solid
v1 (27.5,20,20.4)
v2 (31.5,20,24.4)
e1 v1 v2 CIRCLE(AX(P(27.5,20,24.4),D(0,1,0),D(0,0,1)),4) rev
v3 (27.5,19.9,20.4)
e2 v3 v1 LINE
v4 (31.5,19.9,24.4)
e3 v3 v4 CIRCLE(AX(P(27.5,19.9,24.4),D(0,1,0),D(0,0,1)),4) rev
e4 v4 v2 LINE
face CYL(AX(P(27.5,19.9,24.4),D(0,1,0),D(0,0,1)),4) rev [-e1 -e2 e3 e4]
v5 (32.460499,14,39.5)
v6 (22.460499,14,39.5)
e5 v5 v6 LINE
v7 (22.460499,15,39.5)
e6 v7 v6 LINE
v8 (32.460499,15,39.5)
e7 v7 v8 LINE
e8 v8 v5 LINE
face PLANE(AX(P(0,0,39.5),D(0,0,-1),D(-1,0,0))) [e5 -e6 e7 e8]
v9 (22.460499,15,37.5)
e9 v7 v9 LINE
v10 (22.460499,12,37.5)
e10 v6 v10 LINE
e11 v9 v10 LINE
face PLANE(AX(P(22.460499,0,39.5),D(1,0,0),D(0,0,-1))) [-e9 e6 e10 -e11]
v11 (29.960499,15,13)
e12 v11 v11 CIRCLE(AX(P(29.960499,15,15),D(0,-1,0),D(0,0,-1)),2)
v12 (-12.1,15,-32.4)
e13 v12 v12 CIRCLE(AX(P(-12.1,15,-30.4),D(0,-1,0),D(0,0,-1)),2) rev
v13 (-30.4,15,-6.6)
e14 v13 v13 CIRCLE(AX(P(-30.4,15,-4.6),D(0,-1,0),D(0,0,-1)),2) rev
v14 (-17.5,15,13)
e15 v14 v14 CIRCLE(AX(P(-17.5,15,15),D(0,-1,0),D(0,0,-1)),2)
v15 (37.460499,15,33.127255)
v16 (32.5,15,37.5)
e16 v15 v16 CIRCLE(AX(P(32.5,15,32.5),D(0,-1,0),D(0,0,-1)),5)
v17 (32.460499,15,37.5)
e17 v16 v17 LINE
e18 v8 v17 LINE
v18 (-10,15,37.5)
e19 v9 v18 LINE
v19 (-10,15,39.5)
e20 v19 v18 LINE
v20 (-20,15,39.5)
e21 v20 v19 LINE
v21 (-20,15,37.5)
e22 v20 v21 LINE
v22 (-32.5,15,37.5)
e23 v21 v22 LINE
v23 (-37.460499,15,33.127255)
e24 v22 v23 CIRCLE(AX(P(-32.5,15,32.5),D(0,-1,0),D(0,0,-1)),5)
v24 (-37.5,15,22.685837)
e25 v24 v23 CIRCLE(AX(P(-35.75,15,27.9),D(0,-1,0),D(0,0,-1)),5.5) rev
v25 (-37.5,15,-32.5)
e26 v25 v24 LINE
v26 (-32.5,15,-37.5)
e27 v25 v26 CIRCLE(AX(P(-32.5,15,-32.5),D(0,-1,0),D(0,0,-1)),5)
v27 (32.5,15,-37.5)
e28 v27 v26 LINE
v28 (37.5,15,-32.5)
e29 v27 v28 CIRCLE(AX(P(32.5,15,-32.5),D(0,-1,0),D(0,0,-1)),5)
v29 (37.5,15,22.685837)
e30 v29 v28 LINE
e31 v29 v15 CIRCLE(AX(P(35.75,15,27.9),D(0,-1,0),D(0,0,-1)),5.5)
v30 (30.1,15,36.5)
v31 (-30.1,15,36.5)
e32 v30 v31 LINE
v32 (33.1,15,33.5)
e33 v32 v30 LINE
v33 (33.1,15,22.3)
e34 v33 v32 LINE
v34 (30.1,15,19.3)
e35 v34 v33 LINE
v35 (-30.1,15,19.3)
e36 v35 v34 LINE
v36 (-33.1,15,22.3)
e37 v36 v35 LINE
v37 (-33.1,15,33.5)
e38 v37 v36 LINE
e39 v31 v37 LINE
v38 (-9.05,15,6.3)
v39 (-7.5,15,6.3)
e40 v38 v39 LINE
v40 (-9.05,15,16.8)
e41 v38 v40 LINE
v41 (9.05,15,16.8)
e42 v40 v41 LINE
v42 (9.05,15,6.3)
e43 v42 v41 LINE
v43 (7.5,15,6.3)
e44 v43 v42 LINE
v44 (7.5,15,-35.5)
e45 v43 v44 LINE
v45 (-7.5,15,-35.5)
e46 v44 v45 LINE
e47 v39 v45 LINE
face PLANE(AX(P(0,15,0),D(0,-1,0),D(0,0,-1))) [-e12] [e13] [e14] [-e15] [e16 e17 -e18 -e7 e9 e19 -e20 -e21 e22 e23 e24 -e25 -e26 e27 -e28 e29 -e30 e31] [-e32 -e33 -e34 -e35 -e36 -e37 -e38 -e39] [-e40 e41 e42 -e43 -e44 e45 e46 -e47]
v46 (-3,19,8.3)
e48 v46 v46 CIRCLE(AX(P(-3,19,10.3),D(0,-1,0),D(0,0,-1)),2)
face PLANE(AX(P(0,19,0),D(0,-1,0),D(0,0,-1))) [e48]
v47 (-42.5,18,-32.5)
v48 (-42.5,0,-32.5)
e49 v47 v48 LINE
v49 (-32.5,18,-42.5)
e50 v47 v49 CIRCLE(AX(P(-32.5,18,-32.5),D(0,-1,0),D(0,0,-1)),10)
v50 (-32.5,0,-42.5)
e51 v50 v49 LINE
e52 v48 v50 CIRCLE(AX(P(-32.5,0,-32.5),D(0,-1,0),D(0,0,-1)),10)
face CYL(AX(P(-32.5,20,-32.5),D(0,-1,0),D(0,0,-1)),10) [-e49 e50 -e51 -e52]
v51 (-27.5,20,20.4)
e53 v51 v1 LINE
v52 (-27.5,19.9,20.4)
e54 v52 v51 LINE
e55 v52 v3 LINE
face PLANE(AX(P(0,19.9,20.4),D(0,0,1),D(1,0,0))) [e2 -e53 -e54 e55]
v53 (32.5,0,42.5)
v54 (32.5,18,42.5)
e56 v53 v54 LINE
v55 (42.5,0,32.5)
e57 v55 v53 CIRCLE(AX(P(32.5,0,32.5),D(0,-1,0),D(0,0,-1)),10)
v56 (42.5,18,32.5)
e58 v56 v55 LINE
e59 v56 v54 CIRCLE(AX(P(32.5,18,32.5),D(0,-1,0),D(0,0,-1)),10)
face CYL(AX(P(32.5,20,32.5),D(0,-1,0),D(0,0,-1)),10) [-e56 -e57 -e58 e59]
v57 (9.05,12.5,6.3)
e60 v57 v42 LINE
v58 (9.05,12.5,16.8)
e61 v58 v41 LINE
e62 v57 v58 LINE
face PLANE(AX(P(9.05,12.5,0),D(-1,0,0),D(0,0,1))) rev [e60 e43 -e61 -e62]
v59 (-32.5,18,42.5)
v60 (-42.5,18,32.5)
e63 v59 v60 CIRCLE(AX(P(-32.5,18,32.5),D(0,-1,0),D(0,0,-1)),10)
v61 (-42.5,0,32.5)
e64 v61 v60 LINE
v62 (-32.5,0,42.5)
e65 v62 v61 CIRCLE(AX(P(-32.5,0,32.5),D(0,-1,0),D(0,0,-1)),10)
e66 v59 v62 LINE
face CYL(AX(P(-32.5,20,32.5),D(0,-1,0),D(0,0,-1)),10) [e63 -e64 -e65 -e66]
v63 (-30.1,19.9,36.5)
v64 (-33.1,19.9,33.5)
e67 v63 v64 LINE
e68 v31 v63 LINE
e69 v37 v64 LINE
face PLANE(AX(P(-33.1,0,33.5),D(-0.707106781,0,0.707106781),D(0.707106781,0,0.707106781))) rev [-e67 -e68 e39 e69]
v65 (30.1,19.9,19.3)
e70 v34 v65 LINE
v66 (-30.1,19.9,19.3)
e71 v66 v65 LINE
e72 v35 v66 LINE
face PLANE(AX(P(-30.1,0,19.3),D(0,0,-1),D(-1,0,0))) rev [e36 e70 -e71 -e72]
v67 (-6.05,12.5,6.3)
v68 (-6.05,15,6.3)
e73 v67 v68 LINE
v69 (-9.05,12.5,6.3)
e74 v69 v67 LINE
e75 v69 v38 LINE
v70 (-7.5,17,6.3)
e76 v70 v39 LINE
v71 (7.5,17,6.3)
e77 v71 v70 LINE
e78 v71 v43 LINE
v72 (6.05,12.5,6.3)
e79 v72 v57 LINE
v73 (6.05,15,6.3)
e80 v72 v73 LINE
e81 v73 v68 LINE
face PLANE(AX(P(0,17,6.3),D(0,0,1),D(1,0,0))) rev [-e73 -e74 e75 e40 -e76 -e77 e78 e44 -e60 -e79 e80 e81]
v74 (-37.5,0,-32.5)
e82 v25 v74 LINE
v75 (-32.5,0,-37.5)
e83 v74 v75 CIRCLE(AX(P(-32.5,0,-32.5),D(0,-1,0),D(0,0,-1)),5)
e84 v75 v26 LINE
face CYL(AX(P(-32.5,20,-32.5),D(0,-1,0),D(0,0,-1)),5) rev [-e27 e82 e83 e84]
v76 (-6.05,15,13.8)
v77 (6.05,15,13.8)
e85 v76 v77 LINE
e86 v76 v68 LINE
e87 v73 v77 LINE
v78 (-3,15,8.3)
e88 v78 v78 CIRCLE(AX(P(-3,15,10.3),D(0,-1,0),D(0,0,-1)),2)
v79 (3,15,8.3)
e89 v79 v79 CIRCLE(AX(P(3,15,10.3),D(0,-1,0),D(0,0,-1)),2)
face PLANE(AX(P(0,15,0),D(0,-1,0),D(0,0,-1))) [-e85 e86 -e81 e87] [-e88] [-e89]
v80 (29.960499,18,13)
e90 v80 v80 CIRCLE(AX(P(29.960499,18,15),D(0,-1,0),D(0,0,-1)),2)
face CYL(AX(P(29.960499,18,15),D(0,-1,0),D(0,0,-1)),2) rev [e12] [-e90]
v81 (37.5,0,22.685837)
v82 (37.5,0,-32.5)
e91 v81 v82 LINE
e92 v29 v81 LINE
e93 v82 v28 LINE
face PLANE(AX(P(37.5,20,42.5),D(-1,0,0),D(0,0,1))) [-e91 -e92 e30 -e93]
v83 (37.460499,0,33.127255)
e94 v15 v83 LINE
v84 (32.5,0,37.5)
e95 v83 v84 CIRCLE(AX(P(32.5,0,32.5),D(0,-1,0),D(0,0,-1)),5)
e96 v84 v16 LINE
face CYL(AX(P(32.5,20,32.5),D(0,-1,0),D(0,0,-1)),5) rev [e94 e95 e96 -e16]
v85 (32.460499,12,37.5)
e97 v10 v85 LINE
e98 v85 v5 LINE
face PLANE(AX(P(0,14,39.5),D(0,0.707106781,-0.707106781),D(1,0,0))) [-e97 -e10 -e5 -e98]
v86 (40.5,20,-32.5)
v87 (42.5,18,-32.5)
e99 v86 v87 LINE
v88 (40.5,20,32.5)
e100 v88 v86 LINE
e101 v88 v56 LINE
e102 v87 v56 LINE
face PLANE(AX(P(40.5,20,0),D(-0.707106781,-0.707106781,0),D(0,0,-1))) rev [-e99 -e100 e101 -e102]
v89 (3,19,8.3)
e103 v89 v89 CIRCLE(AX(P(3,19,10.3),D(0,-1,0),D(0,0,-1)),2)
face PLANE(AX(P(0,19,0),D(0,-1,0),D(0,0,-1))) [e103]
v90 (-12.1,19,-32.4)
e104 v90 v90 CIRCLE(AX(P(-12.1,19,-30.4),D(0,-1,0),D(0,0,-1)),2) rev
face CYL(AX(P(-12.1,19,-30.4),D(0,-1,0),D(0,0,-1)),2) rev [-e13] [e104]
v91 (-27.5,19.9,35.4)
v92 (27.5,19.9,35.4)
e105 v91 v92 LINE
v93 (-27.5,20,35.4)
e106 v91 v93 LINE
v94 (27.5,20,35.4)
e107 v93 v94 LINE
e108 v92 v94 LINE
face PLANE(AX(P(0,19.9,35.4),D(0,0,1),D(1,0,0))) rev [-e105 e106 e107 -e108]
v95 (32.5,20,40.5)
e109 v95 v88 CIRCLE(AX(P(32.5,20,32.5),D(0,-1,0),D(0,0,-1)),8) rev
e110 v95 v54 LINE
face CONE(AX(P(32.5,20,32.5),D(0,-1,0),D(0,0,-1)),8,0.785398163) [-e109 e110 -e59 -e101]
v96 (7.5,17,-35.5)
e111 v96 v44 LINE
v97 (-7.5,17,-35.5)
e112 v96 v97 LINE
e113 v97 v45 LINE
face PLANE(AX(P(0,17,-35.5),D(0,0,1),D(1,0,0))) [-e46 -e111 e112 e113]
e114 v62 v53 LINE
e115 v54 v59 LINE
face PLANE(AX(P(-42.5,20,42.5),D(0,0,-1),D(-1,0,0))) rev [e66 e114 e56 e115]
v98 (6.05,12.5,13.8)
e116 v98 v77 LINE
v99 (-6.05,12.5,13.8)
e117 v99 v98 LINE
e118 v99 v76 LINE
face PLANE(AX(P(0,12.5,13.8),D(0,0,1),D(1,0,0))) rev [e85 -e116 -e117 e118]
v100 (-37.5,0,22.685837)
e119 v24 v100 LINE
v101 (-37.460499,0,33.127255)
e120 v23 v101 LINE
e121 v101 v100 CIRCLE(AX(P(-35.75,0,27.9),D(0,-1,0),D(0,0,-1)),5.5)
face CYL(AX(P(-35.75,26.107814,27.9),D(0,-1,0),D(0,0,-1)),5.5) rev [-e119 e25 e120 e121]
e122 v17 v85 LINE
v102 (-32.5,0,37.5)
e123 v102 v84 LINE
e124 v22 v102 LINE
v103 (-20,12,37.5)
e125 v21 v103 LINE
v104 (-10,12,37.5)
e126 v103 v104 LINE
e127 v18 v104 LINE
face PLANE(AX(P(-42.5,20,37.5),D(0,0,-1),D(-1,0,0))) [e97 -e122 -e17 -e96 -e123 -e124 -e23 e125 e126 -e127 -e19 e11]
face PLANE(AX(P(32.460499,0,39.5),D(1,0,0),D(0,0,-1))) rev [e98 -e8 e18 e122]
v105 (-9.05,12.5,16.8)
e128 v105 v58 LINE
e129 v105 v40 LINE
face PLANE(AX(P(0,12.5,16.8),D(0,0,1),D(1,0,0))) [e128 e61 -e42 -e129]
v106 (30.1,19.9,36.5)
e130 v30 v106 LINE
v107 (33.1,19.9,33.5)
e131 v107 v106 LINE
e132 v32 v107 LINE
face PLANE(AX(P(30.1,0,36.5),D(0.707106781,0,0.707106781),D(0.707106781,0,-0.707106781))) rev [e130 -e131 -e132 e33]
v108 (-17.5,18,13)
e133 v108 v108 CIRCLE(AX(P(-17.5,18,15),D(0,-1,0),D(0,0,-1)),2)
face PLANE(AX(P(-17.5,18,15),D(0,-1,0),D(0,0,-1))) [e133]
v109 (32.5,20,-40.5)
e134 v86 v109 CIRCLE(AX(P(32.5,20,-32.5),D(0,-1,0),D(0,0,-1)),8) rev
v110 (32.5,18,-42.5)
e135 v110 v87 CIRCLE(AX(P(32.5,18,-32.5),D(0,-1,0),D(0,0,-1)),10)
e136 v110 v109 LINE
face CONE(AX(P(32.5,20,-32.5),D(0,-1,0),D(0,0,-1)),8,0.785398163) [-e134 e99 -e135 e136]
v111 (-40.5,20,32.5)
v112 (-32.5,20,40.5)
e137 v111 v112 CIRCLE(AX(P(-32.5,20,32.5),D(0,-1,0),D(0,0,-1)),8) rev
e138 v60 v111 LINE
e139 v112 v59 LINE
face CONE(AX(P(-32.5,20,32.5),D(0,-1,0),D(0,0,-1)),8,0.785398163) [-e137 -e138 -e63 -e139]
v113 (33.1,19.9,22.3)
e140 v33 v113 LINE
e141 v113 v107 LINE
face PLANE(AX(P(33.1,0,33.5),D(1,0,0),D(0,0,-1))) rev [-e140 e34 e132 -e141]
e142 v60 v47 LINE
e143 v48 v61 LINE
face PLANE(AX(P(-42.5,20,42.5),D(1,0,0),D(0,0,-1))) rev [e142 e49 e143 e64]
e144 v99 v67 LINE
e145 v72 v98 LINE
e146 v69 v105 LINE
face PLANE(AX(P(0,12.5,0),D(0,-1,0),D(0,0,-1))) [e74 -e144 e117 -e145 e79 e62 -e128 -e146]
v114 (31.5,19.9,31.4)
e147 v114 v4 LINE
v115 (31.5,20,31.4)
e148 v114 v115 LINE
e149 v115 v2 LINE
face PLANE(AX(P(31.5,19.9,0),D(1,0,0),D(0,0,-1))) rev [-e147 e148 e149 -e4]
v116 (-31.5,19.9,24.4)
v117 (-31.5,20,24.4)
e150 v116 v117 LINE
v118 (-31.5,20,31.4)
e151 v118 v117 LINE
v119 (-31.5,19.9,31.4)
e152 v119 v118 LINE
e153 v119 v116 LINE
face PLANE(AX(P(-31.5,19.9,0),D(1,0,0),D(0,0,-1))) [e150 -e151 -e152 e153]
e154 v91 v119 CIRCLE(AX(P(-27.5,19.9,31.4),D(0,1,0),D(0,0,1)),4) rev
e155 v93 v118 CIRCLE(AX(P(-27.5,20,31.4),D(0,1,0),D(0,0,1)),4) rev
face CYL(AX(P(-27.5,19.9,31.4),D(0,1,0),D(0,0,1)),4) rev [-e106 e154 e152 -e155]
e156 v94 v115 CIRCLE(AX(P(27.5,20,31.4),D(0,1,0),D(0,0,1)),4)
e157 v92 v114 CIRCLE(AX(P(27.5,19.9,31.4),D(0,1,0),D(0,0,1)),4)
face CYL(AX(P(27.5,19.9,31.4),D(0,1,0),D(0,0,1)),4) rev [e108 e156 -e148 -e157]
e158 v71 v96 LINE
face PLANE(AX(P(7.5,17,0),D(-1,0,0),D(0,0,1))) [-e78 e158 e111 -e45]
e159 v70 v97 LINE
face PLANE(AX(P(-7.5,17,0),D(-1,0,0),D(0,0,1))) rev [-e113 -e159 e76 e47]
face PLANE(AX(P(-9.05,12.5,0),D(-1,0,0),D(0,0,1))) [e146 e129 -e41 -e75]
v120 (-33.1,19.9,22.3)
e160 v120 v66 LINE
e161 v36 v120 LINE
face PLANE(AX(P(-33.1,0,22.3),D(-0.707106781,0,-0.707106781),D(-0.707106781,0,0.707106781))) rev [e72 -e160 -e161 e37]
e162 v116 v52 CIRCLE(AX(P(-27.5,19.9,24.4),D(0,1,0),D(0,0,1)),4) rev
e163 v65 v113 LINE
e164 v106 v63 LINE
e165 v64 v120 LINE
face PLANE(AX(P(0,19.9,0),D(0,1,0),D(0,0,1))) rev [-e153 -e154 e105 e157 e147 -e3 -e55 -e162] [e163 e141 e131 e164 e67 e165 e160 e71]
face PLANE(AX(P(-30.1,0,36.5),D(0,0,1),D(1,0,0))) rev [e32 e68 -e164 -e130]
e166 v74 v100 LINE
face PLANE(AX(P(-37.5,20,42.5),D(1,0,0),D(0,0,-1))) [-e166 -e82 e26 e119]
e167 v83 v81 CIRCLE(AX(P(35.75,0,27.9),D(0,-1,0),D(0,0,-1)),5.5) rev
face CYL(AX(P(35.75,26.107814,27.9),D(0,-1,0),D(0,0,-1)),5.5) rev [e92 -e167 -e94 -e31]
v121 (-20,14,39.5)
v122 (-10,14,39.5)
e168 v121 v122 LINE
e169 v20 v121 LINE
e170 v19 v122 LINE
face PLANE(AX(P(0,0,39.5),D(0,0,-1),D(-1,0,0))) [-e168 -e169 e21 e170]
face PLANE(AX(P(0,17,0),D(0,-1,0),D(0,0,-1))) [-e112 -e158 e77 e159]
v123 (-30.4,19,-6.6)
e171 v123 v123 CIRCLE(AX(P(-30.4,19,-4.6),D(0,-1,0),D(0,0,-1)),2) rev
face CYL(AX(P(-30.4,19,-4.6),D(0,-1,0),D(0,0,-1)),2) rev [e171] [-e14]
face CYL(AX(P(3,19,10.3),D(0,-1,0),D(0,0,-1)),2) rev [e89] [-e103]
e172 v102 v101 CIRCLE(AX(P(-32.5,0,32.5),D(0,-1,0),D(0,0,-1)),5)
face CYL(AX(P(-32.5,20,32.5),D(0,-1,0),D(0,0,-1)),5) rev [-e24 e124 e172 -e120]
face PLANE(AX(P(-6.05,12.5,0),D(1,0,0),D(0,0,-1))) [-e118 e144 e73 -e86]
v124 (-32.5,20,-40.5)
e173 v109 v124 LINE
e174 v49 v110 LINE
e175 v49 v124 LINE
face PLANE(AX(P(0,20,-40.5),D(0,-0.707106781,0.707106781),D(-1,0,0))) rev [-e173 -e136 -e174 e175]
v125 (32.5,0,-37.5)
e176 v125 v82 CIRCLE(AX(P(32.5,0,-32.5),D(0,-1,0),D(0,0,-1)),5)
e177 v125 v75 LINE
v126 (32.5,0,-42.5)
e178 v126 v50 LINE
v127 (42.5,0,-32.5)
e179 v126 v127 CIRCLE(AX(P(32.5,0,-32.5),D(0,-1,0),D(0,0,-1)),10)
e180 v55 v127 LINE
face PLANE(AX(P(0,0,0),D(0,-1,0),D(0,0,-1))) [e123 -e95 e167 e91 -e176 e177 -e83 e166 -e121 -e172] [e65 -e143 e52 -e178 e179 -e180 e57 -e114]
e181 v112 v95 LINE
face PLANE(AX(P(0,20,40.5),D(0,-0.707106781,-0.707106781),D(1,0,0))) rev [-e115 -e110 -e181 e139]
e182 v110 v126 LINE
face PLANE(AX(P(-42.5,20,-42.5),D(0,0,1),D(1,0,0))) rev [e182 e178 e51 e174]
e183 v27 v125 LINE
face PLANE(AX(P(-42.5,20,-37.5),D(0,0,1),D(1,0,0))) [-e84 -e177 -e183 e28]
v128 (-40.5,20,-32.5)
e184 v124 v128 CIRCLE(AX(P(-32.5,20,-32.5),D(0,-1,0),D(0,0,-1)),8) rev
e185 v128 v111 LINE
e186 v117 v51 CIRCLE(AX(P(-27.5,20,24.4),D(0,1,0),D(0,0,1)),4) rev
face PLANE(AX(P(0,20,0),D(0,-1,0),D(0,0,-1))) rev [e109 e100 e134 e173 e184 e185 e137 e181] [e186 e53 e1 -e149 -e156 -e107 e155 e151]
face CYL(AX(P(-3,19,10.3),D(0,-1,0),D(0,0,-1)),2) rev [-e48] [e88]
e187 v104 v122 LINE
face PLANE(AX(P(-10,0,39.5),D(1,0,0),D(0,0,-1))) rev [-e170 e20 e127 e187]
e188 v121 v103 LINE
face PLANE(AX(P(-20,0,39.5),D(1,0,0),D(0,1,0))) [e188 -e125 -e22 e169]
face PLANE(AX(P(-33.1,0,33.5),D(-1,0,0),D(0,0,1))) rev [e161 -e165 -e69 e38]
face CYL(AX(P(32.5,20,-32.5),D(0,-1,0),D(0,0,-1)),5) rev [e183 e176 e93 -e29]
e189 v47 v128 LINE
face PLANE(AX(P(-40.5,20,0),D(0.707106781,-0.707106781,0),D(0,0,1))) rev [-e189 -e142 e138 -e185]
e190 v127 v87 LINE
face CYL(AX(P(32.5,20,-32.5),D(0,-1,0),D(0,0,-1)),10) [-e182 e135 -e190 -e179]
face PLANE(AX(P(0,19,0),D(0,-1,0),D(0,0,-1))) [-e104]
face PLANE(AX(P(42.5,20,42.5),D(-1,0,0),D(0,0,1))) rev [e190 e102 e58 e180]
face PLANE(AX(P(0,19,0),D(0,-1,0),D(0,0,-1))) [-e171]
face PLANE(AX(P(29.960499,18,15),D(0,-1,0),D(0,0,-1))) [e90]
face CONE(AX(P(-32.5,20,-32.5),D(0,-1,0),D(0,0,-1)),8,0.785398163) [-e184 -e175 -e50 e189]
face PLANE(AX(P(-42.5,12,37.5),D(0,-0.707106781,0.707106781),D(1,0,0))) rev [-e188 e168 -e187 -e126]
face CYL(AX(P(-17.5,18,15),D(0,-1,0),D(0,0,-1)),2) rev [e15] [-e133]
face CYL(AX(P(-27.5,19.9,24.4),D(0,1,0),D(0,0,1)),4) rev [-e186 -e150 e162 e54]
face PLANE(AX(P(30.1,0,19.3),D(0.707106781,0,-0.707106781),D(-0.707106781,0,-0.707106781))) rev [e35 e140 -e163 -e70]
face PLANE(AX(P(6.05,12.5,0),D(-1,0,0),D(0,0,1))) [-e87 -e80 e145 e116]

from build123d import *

# Parameters (mm, degrees)
SKETCH1_W           = 85
SKETCH1_H           = 85
BOSS_EXTRUDE1_DEPTH = 20
FILLET1_R           = 10
CHAMFER1_SIZE       = 2
SHELL2_T            = -5
CUT_EXTRUDE1_DEPTH  = 64.344297297
SKETCH3_W           = 15
SKETCH3_H           = 41.8
CUT_EXTRUDE2_DEPTH  = 2
SKETCH3_4_R         = 2
CUT_EXTRUDE3_DEPTH  = 4
BOSS_EXTRUDE2_DEPTH = 0.1
CUT_EXTRUDE9_START  = -15
CUT_EXTRUDE9_DEPTH  = 15
SKETCH17_W          = 10
SKETCH17_H          = 1
CUT_EXTRUDE10_DEPTH = 2
CHAMFER4_SIZE       = 2
SKETCH18_R          = 2
CUT_EXTRUDE11_DEPTH = 3
SKETCH19_W          = 12.1
SKETCH19_H          = 3
BOSS_EXTRUDE8_DEPTH = 2.5
SKETCH20_R          = 2
CUT_EXTRUDE12_DEPTH = 4


with BuildPart() as part:
    # Sketch1 → Boss-Extrude1 (new body)
    with BuildSketch(Plane(origin=(0, 0, 0), x_dir=(1, 0, 0), z_dir=(0, 1, 0))):
        Rectangle(SKETCH1_W, SKETCH1_H)
    extrude(amount=BOSS_EXTRUDE1_DEPTH)

    # Fillet1
    fillet1_edges = [part.edges().sort_by_distance(p)[0] for p in [
        (42.5, 10, 42.5),
        (-42.5, 10, 42.5),
        (-42.5, 10, -42.5),
        (42.5, 10, -42.5),
    ]]
    fillet(fillet1_edges, radius=FILLET1_R)

    # Chamfer1
    chamfer1_edges = [part.edges().sort_by_distance(p)[0] for p in [
        (-42.5, 20, 0),
        (0, 20, -42.5),
        (42.5, 20, 0),
        (0, 20, 42.5),
        (-39.571067812, 20, 39.571067812),
        (39.571067812, 20, 39.571067812),
        (39.571067812, 20, -39.571067812),
        (-39.571067812, 20, -39.571067812),
    ]]
    chamfer(chamfer1_edges, length=CHAMFER1_SIZE)

    # Shell2
    shell2_openings = [part.faces().sort_by_distance(p)[0] for p in [
        (0, 0, 0),
    ]]
    offset(amount=SHELL2_T, openings=shell2_openings, kind=Kind.INTERSECTION)

    # Sketch2 → Cut-Extrude1 (cut, through all)
    with BuildSketch(Plane(origin=(0, 20, 0), x_dir=(1, 0, 0), z_dir=(0, 1, 0))):
        Polygon((-30.1, -36.5), (30.1, -36.5), (33.1, -33.5), (33.1, -22.3), (30.1, -19.3), (-30.1, -19.3), (-33.1, -22.3), (-33.1, -33.5), align=None)
    extrude(amount=-CUT_EXTRUDE1_DEPTH, mode=Mode.SUBTRACT)

    # Sketch3 → Cut-Extrude2 (cut)
    with BuildSketch(Plane.XZ.offset(-15)):
        with Locations((0, -14.6)):
            Rectangle(SKETCH3_W, SKETCH3_H)
    extrude(amount=-CUT_EXTRUDE2_DEPTH, mode=Mode.SUBTRACT)

    # Sketch3<4> → Cut-Extrude3 (cut)
    with BuildSketch(Plane.XZ.offset(-15)):
        with Locations(Location((-3, 10.3, 0), (0, 0, 270))):
            Circle(SKETCH3_4_R)
        with Locations(Location((3, 10.3, 0), (0, 0, 270))):
            Circle(SKETCH3_4_R)
    extrude(amount=-CUT_EXTRUDE3_DEPTH, mode=Mode.SUBTRACT)

    # Sketch4 → Boss-Extrude2 (add)
    with BuildSketch(Plane(origin=(0, 20, 0), x_dir=(1, 0, 0), z_dir=(0, 1, 0))):
        Polygon((-33.1, -33.5), (-33.1, -22.3), (-30.1, -19.3), (30.1, -19.3), (33.1, -22.3), (33.1, -33.5), (30.1, -36.5), (-30.1, -36.5), align=None)
        with BuildLine():
            Line((-31.5, -31.4), (-31.5, -24.4))
            ThreePointArc((-31.5, -24.4), (-30.328427125, -21.571572875), (-27.5, -20.4))
            Line((-27.5, -20.4), (27.5, -20.4))
            ThreePointArc((27.5, -20.4), (30.328427125, -21.571572875), (31.5, -24.4))
            Line((31.5, -24.4), (31.5, -31.4))
            ThreePointArc((31.5, -31.4), (30.328427125, -34.228427125), (27.5, -35.4))
            Line((27.5, -35.4), (-27.5, -35.4))
            ThreePointArc((-27.5, -35.4), (-30.328427125, -34.228427125), (-31.5, -31.4))
        make_face(mode=Mode.SUBTRACT)
    extrude(amount=-BOSS_EXTRUDE2_DEPTH)

    # Sketch5 → Cut-Extrude9 (cut)
    with BuildSketch(Plane.XZ.offset(CUT_EXTRUDE9_START)):
        with BuildLine():
            ThreePointArc((-37.460499109, 33.127254805), (-41.249960643, 27.920806881), (-37.5, 22.685836596))
            Line((-37.5, 22.685836596), (-37.5, 32.5))
            ThreePointArc((-37.5, 32.5), (-37.490115006, 32.814248672), (-37.460499109, 33.127254805))
        make_face()
        with BuildLine():
            Line((37.5, 32.5), (37.5, 22.685836596))
            ThreePointArc((37.5, 22.685836596), (41.249960643, 27.920806881), (37.460499109, 33.127254805))
            ThreePointArc((37.460499109, 33.127254805), (37.490115006, 32.814248672), (37.5, 32.5))
        make_face()
    extrude(amount=CUT_EXTRUDE9_DEPTH, mode=Mode.SUBTRACT)

    # Sketch17 → Cut-Extrude10 (cut)
    with BuildSketch(Plane(origin=(0, 0, 37.5), x_dir=(-1, 0, 0), z_dir=(0, 0, -1))):
        with Locations((-27.460499109, 14.5)):
            Rectangle(SKETCH17_W, SKETCH17_H)
        with Locations((15, 14.5)):
            Rectangle(SKETCH17_W, SKETCH17_H)
    extrude(amount=-CUT_EXTRUDE10_DEPTH, mode=Mode.SUBTRACT)

    # Chamfer4
    chamfer4_edges = [part.edges().sort_by_distance(p)[0] for p in [
        (27.460499109, 14, 37.5),
        (-15, 14, 37.5),
    ]]
    chamfer(chamfer4_edges, length=CHAMFER4_SIZE - 0.0001)  # a hair under: the kernel refuses the full size

    # Sketch18 → Cut-Extrude11 (cut)
    with BuildSketch(Plane.XZ.offset(-15)):
        with Locations(Location((-17.5, 15, 0), (0, 0, 270))):
            Circle(SKETCH18_R)
        with Locations(Location((29.960499109, 15, 0), (0, 0, 270))):
            Circle(SKETCH18_R)
    extrude(amount=-CUT_EXTRUDE11_DEPTH, mode=Mode.SUBTRACT)

    # Sketch19 → Boss-Extrude8 (add)
    with BuildSketch(Plane.XZ.offset(-15)):
        with Locations((0, 15.3)):
            Rectangle(SKETCH19_W, SKETCH19_H)
        Polygon((-6.05, 6.3), (-6.05, 13.8), (-6.05, 16.8), (-9.05, 16.8), (-9.05, 6.3), align=None)
        Polygon((6.05, 16.8), (6.05, 13.8), (6.05, 6.3), (9.05, 6.3), (9.05, 16.8), align=None)
    extrude(amount=BOSS_EXTRUDE8_DEPTH)

    # Sketch20 → Cut-Extrude12 (cut)
    with BuildSketch(Plane.XZ.offset(-15)):
        with Locations(Location((-30.4, -4.6, 0), (0, 0, 270))):
            Circle(SKETCH20_R)
        with Locations(Location((-12.1, -30.4, 0), (0, 0, 270))):
            Circle(SKETCH20_R)
    extrude(amount=-CUT_EXTRUDE12_DEPTH, mode=Mode.SUBTRACT)


solid = part.part
